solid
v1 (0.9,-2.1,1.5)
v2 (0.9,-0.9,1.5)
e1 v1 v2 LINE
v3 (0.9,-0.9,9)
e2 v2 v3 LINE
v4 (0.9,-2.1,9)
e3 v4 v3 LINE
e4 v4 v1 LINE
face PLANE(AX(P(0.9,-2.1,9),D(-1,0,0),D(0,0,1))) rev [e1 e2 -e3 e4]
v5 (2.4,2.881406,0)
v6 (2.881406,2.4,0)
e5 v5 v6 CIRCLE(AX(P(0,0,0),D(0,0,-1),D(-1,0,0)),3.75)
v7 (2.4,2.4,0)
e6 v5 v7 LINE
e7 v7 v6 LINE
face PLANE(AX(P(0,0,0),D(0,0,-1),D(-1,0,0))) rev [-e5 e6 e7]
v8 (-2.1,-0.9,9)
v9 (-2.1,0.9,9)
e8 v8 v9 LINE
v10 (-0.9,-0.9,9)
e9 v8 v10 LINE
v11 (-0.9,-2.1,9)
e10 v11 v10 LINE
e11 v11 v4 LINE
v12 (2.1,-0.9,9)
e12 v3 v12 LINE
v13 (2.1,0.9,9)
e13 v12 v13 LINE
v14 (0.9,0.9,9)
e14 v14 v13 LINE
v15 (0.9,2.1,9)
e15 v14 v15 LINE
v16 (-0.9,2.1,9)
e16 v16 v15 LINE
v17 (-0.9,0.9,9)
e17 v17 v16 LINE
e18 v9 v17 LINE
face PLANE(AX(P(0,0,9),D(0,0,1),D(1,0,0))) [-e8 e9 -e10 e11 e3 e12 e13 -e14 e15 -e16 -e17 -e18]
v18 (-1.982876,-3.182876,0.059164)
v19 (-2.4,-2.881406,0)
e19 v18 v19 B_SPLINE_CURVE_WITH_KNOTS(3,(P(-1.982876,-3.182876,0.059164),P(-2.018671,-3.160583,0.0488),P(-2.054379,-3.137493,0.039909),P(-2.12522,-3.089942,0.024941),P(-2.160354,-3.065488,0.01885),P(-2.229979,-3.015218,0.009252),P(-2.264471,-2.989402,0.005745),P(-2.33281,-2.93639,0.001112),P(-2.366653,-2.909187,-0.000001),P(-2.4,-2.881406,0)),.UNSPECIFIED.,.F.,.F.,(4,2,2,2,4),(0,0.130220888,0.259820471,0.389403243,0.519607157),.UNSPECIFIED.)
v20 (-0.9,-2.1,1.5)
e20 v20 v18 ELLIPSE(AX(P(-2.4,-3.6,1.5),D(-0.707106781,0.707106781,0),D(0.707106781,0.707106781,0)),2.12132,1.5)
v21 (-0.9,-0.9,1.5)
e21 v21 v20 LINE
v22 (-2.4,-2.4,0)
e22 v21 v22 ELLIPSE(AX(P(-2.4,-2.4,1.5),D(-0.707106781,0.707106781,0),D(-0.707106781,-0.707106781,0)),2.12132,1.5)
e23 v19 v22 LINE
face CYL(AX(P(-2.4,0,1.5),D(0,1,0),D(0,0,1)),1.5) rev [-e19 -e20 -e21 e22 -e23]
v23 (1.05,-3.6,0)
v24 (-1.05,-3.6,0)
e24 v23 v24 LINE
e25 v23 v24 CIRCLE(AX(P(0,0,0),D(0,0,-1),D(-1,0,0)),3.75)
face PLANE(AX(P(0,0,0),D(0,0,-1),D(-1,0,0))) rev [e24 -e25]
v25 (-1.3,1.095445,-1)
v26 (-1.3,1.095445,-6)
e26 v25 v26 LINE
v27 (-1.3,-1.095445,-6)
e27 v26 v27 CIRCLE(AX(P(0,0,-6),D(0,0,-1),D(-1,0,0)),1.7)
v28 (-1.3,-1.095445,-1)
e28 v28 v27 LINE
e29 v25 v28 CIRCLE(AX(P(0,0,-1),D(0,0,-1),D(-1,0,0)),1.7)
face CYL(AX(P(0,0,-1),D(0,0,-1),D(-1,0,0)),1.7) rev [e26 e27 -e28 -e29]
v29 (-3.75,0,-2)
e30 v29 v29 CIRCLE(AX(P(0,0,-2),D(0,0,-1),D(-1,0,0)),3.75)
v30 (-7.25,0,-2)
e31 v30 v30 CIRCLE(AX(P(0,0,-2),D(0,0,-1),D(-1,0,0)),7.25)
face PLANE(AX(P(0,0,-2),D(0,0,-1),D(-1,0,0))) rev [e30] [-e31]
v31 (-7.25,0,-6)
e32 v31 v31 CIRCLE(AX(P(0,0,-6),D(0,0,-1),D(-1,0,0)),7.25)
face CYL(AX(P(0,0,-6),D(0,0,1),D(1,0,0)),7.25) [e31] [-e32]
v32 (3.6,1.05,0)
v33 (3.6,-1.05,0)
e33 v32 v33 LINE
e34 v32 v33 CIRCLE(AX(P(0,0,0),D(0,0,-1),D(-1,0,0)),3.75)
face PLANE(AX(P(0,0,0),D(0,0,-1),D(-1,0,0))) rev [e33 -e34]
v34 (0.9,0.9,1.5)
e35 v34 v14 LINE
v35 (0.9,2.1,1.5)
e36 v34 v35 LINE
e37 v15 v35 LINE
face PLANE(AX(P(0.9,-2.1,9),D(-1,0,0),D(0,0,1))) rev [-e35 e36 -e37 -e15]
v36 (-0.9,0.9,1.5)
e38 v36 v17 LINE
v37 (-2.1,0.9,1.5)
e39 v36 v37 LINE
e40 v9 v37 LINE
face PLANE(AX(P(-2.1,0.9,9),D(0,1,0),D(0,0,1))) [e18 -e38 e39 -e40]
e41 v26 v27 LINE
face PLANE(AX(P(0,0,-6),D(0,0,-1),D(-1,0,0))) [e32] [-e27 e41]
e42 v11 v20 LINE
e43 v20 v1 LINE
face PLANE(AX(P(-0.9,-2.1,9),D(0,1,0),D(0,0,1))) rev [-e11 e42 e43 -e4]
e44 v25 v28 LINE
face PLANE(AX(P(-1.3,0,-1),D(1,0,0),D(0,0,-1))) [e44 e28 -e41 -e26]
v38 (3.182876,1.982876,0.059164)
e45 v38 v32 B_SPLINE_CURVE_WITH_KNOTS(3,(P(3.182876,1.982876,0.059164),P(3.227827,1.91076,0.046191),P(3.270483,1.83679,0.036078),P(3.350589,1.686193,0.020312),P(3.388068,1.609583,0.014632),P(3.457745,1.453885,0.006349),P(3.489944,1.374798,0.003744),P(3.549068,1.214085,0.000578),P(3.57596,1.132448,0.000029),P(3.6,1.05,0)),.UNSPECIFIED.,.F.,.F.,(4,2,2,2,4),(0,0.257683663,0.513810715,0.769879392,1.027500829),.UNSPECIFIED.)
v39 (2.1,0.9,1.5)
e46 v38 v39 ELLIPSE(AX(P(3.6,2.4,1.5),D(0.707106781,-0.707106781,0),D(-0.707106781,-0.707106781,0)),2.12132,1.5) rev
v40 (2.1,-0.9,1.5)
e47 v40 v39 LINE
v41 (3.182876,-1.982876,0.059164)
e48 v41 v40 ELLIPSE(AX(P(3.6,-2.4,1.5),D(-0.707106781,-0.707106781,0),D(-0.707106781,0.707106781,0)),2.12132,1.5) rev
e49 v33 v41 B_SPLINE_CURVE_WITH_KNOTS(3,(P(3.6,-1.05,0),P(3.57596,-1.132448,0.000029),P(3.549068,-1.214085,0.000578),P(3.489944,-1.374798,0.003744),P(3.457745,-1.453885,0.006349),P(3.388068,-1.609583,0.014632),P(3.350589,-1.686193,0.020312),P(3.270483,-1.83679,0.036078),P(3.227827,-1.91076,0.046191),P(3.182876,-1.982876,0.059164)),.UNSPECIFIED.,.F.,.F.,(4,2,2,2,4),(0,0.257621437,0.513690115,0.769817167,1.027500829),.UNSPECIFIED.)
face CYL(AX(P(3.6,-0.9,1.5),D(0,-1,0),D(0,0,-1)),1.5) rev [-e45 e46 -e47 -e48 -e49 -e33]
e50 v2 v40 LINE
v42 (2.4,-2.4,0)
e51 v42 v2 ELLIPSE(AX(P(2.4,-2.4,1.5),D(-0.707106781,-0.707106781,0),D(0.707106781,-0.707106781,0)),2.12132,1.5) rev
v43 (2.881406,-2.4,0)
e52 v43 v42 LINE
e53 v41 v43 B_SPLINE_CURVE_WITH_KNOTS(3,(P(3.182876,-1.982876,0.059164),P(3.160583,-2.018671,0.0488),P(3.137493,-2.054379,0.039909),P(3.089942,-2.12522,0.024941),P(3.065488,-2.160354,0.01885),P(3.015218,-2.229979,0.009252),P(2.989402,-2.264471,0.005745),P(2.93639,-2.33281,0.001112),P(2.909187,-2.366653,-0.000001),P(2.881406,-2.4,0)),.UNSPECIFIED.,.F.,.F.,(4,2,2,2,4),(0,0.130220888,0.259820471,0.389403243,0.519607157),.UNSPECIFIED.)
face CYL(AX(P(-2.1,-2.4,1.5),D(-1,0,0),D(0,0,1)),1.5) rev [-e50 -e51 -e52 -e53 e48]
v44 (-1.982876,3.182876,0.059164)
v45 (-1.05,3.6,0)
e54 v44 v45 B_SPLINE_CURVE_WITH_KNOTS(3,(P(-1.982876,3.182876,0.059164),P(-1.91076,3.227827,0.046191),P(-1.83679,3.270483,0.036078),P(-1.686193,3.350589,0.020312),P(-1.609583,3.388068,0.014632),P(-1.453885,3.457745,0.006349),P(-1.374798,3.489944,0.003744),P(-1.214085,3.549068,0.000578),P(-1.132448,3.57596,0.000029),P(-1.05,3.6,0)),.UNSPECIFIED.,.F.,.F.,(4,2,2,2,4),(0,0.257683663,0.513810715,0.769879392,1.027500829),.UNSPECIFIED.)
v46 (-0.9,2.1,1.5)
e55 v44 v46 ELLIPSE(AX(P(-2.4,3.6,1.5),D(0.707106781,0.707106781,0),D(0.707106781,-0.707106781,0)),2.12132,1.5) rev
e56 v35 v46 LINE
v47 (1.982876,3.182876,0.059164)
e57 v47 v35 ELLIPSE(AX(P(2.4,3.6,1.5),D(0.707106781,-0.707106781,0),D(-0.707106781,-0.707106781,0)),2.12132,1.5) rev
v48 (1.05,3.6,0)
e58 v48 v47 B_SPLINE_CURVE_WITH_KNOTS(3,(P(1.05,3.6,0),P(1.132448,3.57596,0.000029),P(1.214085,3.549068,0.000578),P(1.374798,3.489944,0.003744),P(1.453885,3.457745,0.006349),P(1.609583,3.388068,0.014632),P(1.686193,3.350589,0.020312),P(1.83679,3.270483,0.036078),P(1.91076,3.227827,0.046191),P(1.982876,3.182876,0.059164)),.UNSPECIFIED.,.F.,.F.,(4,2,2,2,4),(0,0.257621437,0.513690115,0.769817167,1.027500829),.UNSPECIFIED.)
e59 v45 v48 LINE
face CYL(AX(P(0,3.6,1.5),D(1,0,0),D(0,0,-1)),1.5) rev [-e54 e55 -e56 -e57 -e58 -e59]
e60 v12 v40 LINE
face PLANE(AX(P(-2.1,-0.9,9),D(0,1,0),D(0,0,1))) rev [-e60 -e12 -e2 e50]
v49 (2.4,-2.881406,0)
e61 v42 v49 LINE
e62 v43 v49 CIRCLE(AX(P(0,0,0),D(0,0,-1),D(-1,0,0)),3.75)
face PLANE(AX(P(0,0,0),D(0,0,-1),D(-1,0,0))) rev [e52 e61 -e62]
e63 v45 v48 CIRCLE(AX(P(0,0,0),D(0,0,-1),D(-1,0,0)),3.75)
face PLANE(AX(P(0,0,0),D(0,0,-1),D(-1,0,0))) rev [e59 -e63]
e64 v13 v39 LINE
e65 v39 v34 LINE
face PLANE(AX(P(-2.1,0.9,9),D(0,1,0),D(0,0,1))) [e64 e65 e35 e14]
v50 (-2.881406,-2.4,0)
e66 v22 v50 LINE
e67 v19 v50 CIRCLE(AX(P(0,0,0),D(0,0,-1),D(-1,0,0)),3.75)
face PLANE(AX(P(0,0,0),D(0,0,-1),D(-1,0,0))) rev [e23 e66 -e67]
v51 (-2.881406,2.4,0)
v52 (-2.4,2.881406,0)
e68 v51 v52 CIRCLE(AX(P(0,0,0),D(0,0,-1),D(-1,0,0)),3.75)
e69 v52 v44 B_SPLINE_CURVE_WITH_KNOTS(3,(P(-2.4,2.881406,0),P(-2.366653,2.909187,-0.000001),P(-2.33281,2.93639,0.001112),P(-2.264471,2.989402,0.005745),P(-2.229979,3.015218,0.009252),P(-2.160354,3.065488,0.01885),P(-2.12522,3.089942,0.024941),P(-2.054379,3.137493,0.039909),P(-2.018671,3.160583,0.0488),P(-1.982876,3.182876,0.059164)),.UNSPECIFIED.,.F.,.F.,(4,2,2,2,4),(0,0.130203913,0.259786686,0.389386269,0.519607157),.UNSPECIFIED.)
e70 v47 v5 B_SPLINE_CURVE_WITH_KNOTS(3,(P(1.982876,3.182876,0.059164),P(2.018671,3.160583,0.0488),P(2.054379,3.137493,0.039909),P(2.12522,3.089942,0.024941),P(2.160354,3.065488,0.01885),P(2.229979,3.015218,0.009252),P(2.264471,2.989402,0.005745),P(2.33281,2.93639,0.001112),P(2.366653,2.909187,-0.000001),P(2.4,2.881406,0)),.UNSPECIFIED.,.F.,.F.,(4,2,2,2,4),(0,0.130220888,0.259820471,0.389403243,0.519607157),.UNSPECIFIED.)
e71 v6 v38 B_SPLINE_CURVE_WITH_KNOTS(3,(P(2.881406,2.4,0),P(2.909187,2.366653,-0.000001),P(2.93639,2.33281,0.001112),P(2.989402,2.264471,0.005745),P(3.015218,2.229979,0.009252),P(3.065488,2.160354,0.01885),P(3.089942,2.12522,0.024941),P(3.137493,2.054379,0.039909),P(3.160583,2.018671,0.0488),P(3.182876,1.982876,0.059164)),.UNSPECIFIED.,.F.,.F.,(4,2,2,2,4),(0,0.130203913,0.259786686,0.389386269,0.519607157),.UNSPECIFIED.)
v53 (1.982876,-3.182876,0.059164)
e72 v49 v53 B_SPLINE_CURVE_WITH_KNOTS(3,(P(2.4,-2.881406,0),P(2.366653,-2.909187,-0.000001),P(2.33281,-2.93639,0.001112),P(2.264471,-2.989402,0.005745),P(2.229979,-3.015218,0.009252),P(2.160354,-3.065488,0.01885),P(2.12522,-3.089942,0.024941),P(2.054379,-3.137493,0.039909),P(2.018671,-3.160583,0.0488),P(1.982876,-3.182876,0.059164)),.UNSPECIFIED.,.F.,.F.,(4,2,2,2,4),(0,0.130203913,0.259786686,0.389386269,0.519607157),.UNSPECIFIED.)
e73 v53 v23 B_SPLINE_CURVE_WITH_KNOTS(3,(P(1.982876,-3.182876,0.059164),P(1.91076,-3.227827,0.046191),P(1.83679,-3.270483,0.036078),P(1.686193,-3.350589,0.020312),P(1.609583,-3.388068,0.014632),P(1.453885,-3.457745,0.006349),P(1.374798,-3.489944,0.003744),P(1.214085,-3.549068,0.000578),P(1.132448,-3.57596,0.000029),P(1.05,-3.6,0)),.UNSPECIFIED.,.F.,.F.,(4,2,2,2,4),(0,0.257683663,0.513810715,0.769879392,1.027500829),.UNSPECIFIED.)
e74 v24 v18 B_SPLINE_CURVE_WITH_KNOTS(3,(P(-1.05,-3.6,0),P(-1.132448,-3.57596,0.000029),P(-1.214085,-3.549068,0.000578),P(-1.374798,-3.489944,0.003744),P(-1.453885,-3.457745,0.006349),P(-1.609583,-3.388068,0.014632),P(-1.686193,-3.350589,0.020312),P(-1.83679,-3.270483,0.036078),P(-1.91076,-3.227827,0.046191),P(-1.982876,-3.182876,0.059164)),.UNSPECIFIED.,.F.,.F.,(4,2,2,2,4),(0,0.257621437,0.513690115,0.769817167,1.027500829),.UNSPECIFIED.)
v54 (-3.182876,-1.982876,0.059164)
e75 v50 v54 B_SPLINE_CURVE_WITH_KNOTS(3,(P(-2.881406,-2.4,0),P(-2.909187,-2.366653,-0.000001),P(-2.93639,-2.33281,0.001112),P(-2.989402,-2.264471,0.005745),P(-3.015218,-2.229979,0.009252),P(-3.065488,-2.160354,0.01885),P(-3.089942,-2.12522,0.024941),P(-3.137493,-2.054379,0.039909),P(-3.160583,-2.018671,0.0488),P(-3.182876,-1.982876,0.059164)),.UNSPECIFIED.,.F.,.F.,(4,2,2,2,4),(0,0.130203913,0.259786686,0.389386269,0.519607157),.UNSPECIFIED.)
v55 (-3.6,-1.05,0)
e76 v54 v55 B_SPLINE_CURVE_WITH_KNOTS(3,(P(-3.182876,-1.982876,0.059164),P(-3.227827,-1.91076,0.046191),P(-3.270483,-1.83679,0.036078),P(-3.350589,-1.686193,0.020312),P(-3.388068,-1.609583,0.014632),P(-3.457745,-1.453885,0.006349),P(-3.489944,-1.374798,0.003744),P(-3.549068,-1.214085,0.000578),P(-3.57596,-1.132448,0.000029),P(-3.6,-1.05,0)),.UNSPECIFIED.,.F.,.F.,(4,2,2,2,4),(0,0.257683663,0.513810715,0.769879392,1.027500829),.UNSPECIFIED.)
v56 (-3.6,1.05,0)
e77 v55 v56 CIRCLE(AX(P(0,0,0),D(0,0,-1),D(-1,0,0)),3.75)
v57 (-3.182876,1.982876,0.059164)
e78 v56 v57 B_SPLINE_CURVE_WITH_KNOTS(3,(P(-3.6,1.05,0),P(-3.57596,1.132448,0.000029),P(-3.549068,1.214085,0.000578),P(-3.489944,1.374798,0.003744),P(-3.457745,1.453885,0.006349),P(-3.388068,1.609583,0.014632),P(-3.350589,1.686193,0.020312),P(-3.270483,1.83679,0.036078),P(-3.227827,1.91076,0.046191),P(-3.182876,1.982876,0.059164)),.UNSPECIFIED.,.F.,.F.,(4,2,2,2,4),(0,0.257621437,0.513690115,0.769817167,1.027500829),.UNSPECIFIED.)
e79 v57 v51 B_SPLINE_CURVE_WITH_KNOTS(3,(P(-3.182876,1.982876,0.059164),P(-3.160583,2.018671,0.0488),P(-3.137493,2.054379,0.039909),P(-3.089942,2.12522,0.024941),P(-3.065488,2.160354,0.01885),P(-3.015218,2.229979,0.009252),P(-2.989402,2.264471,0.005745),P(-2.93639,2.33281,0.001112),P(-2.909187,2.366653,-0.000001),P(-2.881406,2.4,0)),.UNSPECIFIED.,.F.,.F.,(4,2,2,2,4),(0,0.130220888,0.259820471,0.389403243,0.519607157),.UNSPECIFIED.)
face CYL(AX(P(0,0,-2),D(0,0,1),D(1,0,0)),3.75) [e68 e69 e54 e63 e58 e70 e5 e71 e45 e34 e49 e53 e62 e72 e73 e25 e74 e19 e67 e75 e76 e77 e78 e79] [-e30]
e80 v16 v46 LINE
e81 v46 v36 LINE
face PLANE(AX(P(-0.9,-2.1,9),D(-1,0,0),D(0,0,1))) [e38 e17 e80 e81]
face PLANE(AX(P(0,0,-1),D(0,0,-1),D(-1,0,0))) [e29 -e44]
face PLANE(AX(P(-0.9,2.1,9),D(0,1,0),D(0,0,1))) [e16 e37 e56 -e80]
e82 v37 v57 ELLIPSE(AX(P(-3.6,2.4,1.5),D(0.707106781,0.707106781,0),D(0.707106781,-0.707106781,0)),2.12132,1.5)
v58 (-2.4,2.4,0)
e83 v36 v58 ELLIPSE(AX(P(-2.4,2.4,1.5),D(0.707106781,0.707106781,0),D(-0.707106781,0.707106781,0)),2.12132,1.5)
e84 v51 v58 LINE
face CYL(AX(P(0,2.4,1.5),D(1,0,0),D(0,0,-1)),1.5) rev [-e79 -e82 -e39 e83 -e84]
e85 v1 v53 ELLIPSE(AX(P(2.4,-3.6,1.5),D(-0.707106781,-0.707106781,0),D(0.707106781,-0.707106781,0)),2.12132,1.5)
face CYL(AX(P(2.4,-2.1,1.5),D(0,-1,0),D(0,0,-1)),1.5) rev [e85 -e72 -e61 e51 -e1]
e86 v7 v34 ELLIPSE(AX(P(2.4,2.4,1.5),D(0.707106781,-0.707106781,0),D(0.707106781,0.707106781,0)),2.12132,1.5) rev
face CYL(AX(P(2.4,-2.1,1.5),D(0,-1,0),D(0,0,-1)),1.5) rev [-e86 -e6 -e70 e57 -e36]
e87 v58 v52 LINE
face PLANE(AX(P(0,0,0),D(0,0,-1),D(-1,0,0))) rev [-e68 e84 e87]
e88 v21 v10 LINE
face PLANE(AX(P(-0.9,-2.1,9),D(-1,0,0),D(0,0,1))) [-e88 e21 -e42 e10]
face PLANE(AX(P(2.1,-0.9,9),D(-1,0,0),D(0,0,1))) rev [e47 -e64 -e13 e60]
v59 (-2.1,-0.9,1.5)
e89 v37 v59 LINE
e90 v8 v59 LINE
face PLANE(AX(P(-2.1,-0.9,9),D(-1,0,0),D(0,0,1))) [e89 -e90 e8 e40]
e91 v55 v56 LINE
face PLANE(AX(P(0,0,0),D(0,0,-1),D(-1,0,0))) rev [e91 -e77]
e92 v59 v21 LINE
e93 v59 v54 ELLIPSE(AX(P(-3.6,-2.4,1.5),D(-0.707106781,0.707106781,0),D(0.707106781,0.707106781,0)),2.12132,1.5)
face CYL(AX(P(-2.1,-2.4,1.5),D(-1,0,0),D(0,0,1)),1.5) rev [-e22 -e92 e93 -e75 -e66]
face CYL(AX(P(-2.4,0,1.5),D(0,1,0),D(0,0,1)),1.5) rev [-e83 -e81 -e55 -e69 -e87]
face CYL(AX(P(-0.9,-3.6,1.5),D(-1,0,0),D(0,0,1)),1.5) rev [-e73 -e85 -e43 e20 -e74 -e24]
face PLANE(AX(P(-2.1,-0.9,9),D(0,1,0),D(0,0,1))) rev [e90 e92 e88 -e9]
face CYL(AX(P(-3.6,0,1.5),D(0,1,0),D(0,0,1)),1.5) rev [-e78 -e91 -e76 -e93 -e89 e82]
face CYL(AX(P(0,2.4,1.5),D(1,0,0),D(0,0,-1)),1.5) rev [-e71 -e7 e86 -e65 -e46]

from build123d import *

# Parameters (mm, degrees)
SKETCH_1_W          = 1.8
SKETCH_1_H          = 4.2
SKETCH_1_W_2        = 4.2
SKETCH_1_H_2        = 1.8
EXTRUDE_1_DEPTH     = 9
SKETCH_3_R          = 3.75
EXTRUDE_5_DEPTH     = 2
FILLET_2_R          = 1.5
SKETCH_8_R          = 7.25
EXTRUDE_6_DEPTH     = 4
CUT_EXTRUDE_1_DEPTH = 5


with BuildPart() as part:
    # 草图1 → 凸台-拉伸1 (new body)
    with BuildSketch(Plane.XY):
        Rectangle(SKETCH_1_W, SKETCH_1_H)
        Rectangle(SKETCH_1_W_2, SKETCH_1_H_2)
    extrude(amount=EXTRUDE_1_DEPTH)

    # 草图3 → 凸台-拉伸5 (add)
    with BuildSketch(Plane(origin=(0, 0, 0), x_dir=(-1, 0, 0), z_dir=(0, 0, -1))):
        Circle(SKETCH_3_R)
    extrude(amount=EXTRUDE_5_DEPTH)

    # 圆角2
    # the kernel refuses this fillet: 1.5 mm, written as the material it adds along each edge
    with BuildSketch(Plane(origin=(-2.85, -0.9, 0), x_dir=(0, -1, 0), z_dir=(1, 0, 0))) as fillet_2_piece_1_section:
        with BuildLine():
            CenterArc((FILLET_2_R, -FILLET_2_R), FILLET_2_R, 90, 90)
            Line((0, -FILLET_2_R), (0, 0))
            Line((0, 0), (FILLET_2_R, 0))
        make_face()
    fillet_2_piece_1 = extrude(amount=4.95, mode=Mode.PRIVATE)
    fillet_2_piece_1 = split(fillet_2_piece_1, bisect_by=Plane(origin=(-2.1, -1.239592671, 0.339592671), z_dir=(1, 0, 0)), keep=Keep.TOP, mode=Mode.PRIVATE)
    add(fillet_2_piece_1)
    with BuildSketch(Plane(origin=(2.1, 0.9, 0), x_dir=(0, 1, 0), z_dir=(-1, 0, 0))) as fillet_2_piece_2_section:
        with BuildLine():
            CenterArc((FILLET_2_R, -FILLET_2_R), FILLET_2_R, 90, 90)
            Line((0, -FILLET_2_R), (0, 0))
            Line((0, 0), (FILLET_2_R, 0))
        make_face()
    fillet_2_piece_2 = extrude(amount=4.95, mode=Mode.PRIVATE)
    fillet_2_piece_2 = split(fillet_2_piece_2, bisect_by=Plane(origin=(-2.1, 1.239592671, 0.339592671), z_dir=(1, 0, 0)), keep=Keep.TOP, mode=Mode.PRIVATE)
    add(fillet_2_piece_2)
    with BuildSketch(Plane(origin=(-0.9, -2.1, 0), x_dir=(0, -1, 0), z_dir=(1, 0, 0)), Plane(origin=(0.9, 2.1, 0), x_dir=(0, 1, 0), z_dir=(-1, 0, 0)), Plane(origin=(-2.1, 0.9, 0), x_dir=(-1, 0, 0), z_dir=(0, -1, 0)), Plane(origin=(2.1, -0.9, 0), x_dir=(1, 0, 0), z_dir=(0, 1, 0))) as fillet_2_piece_3:
        with BuildLine():
            CenterArc((FILLET_2_R, -FILLET_2_R), FILLET_2_R, 90, 90)
            Line((0, -FILLET_2_R), (0, 0))
            Line((0, 0), (FILLET_2_R, 0))
        make_face()
    extrude(amount=1.8)
    with BuildSketch(Plane(origin=(0.9, -2.1, 0), x_dir=(1, 0, 0), z_dir=(0, 1, 0))) as fillet_2_piece_4_section:
        with BuildLine():
            CenterArc((FILLET_2_R, -FILLET_2_R), FILLET_2_R, 90, 90)
            Line((0, -FILLET_2_R), (0, 0))
            Line((0, 0), (FILLET_2_R, 0))
        make_face()
    fillet_2_piece_4 = extrude(amount=4.95, mode=Mode.PRIVATE)
    fillet_2_piece_4 = split(fillet_2_piece_4, bisect_by=Plane(origin=(1.239592671, 2.1, 0.339592671), z_dir=(0, -1, 0)), keep=Keep.TOP, mode=Mode.PRIVATE)
    add(fillet_2_piece_4)
    with BuildSketch(Plane(origin=(0.9, -2.85, 0), x_dir=(1, 0, 0), z_dir=(0, 1, 0))) as fillet_2_piece_5_section:
        with BuildLine():
            CenterArc((FILLET_2_R, -FILLET_2_R), FILLET_2_R, 90, 90)
            Line((0, -FILLET_2_R), (0, 0))
            Line((0, 0), (FILLET_2_R, 0))
        make_face()
    fillet_2_piece_5 = extrude(amount=4.95, mode=Mode.PRIVATE)
    fillet_2_piece_5 = split(fillet_2_piece_5, bisect_by=Plane(origin=(1.239592671, -2.1, 0.339592671), z_dir=(0, 1, 0)), keep=Keep.TOP, mode=Mode.PRIVATE)
    add(fillet_2_piece_5)
    with BuildSketch(Plane(origin=(-0.9, 2.85, 0), x_dir=(-1, 0, 0), z_dir=(0, -1, 0))) as fillet_2_piece_6_section:
        with BuildLine():
            CenterArc((FILLET_2_R, -FILLET_2_R), FILLET_2_R, 90, 90)
            Line((0, -FILLET_2_R), (0, 0))
            Line((0, 0), (FILLET_2_R, 0))
        make_face()
    fillet_2_piece_6 = extrude(amount=4.95, mode=Mode.PRIVATE)
    fillet_2_piece_6 = split(fillet_2_piece_6, bisect_by=Plane(origin=(-1.239592671, 2.1, 0.339592671), z_dir=(0, -1, 0)), keep=Keep.TOP, mode=Mode.PRIVATE)
    add(fillet_2_piece_6)
    with BuildSketch(Plane(origin=(-0.9, 2.1, 0), x_dir=(-1, 0, 0), z_dir=(0, -1, 0))) as fillet_2_piece_7_section:
        with BuildLine():
            CenterArc((FILLET_2_R, -FILLET_2_R), FILLET_2_R, 90, 90)
            Line((0, -FILLET_2_R), (0, 0))
            Line((0, 0), (FILLET_2_R, 0))
        make_face()
    fillet_2_piece_7 = extrude(amount=4.95, mode=Mode.PRIVATE)
    fillet_2_piece_7 = split(fillet_2_piece_7, bisect_by=Plane(origin=(-1.239592671, -2.1, 0.339592671), z_dir=(0, 1, 0)), keep=Keep.TOP, mode=Mode.PRIVATE)
    add(fillet_2_piece_7)
    with BuildSketch(Plane(origin=(2.85, 0.9, 0), x_dir=(0, 1, 0), z_dir=(-1, 0, 0))) as fillet_2_piece_8_section:
        with BuildLine():
            CenterArc((FILLET_2_R, -FILLET_2_R), FILLET_2_R, 90, 90)
            Line((0, -FILLET_2_R), (0, 0))
            Line((0, 0), (FILLET_2_R, 0))
        make_face()
    fillet_2_piece_8 = extrude(amount=4.95, mode=Mode.PRIVATE)
    fillet_2_piece_8 = split(fillet_2_piece_8, bisect_by=Plane(origin=(2.1, 1.239592671, 0.339592671), z_dir=(-1, 0, 0)), keep=Keep.TOP, mode=Mode.PRIVATE)
    add(fillet_2_piece_8)
    with BuildSketch(Plane(origin=(-2.1, -0.9, 0), x_dir=(0, -1, 0), z_dir=(1, 0, 0))) as fillet_2_piece_9_section:
        with BuildLine():
            CenterArc((FILLET_2_R, -FILLET_2_R), FILLET_2_R, 90, 90)
            Line((0, -FILLET_2_R), (0, 0))
            Line((0, 0), (FILLET_2_R, 0))
        make_face()
    fillet_2_piece_9 = extrude(amount=4.95, mode=Mode.PRIVATE)
    fillet_2_piece_9 = split(fillet_2_piece_9, bisect_by=Plane(origin=(2.1, -1.239592671, 0.339592671), z_dir=(-1, 0, 0)), keep=Keep.TOP, mode=Mode.PRIVATE)
    add(fillet_2_piece_9)
    with BuildSketch(Plane(origin=(2.1, -4.65, 0), x_dir=(1, 0, 0), z_dir=(0, 1, 0))) as fillet_2_piece_10a_section:
        with BuildLine():
            CenterArc((FILLET_2_R, -FILLET_2_R), FILLET_2_R, 90, 90)
            Line((0, -FILLET_2_R), (0, 0))
            Line((0, 0), (FILLET_2_R, 0))
        make_face()
    fillet_2_piece_10a = extrude(amount=5.55, mode=Mode.PRIVATE)
    fillet_2_piece_10a = fillet_2_piece_10a & Plane(origin=(0, 0, 0.370789592), x_dir=(-1, 0, 0), z_dir=(0, 0, 1)) * Cylinder(3.75, 18, mode=Mode.PRIVATE)
    fillet_2_piece_10a = split(fillet_2_piece_10a, bisect_by=Plane(origin=(2.382978133, -0.9, 0.370789592), z_dir=(0, -1, 0)), keep=Keep.TOP, mode=Mode.PRIVATE)
    with BuildSketch(Plane(origin=(0.9, -0.9, 0), x_dir=(0, -1, 0), z_dir=(1, 0, 0))) as fillet_2_piece_10b_section:
        with BuildLine():
            CenterArc((FILLET_2_R, -FILLET_2_R), FILLET_2_R, 90, 90)
            Line((0, -FILLET_2_R), (0, 0))
            Line((0, 0), (FILLET_2_R, 0))
        make_face()
    fillet_2_piece_10b = extrude(amount=4.95, mode=Mode.PRIVATE)
    fillet_2_piece_10b = fillet_2_piece_10b & Plane(origin=(0, 0, 0.356473498), x_dir=(-1, 0, 0), z_dir=(0, 0, 1)) * Cylinder(3.75, 16, mode=Mode.PRIVATE)
    fillet_2_piece_10b = split(fillet_2_piece_10b, bisect_by=Plane(origin=(2.1, -1.208975446, 0.356473498), z_dir=(1, 0, 0)), keep=Keep.TOP, mode=Mode.PRIVATE)
    fillet_2_piece_10 = fillet_2_piece_10a & fillet_2_piece_10b
    add(fillet_2_piece_10)
    with BuildSketch(Plane(origin=(5.85, 0.9, 0), x_dir=(0, 1, 0), z_dir=(-1, 0, 0))) as fillet_2_piece_11a_section:
        with BuildLine():
            CenterArc((FILLET_2_R, -FILLET_2_R), FILLET_2_R, 90, 90)
            Line((0, -FILLET_2_R), (0, 0))
            Line((0, 0), (FILLET_2_R, 0))
        make_face()
    fillet_2_piece_11a = extrude(amount=4.95, mode=Mode.PRIVATE)
    fillet_2_piece_11a = fillet_2_piece_11a & Plane(origin=(0, 0, 0.356473584), x_dir=(-1, 0, 0), z_dir=(0, 0, 1)) * Cylinder(3.75, 16, mode=Mode.PRIVATE)
    fillet_2_piece_11a = split(fillet_2_piece_11a, bisect_by=Plane(origin=(2.1, 1.208975364, 0.356473584), z_dir=(1, 0, 0)), keep=Keep.TOP, mode=Mode.PRIVATE)
    with BuildSketch(Plane(origin=(2.1, -0.9, 0), x_dir=(1, 0, 0), z_dir=(0, 1, 0))) as fillet_2_piece_11b_section:
        with BuildLine():
            CenterArc((FILLET_2_R, -FILLET_2_R), FILLET_2_R, 90, 90)
            Line((0, -FILLET_2_R), (0, 0))
            Line((0, 0), (FILLET_2_R, 0))
        make_face()
    fillet_2_piece_11b = extrude(amount=5.55, mode=Mode.PRIVATE)
    fillet_2_piece_11b = fillet_2_piece_11b & Plane(origin=(0, 0, 0.370789978), x_dir=(-1, 0, 0), z_dir=(0, 0, 1)) * Cylinder(3.75, 18, mode=Mode.PRIVATE)
    fillet_2_piece_11b = split(fillet_2_piece_11b, bisect_by=Plane(origin=(2.382978714, 0.9, 0.370789978), z_dir=(0, 1, 0)), keep=Keep.TOP, mode=Mode.PRIVATE)
    fillet_2_piece_11 = fillet_2_piece_11a & fillet_2_piece_11b
    add(fillet_2_piece_11)
    with BuildSketch(Plane(origin=(-0.9, -0.9, 0), x_dir=(-1, 0, 0), z_dir=(0, -1, 0))) as fillet_2_piece_12a_section:
        with BuildLine():
            CenterArc((FILLET_2_R, -FILLET_2_R), FILLET_2_R, 90, 90)
            Line((0, -FILLET_2_R), (0, 0))
            Line((0, 0), (FILLET_2_R, 0))
        make_face()
    fillet_2_piece_12a = extrude(amount=4.95, mode=Mode.PRIVATE)
    fillet_2_piece_12a = fillet_2_piece_12a & Plane(origin=(0, 0, 0.356473498), x_dir=(-1, 0, 0), z_dir=(0, 0, 1)) * Cylinder(3.75, 16, mode=Mode.PRIVATE)
    fillet_2_piece_12a = split(fillet_2_piece_12a, bisect_by=Plane(origin=(-1.208975446, -2.1, 0.356473498), z_dir=(0, -1, 0)), keep=Keep.TOP, mode=Mode.PRIVATE)
    with BuildSketch(Plane(origin=(-4.65, -2.1, 0), x_dir=(0, -1, 0), z_dir=(1, 0, 0))) as fillet_2_piece_12b_section:
        with BuildLine():
            CenterArc((FILLET_2_R, -FILLET_2_R), FILLET_2_R, 90, 90)
            Line((0, -FILLET_2_R), (0, 0))
            Line((0, 0), (FILLET_2_R, 0))
        make_face()
    fillet_2_piece_12b = extrude(amount=5.55, mode=Mode.PRIVATE)
    fillet_2_piece_12b = fillet_2_piece_12b & Plane(origin=(0, 0, 0.370789592), x_dir=(-1, 0, 0), z_dir=(0, 0, 1)) * Cylinder(3.75, 18, mode=Mode.PRIVATE)
    fillet_2_piece_12b = split(fillet_2_piece_12b, bisect_by=Plane(origin=(-0.9, -2.382978133, 0.370789592), z_dir=(-1, 0, 0)), keep=Keep.TOP, mode=Mode.PRIVATE)
    fillet_2_piece_12 = fillet_2_piece_12a & fillet_2_piece_12b
    add(fillet_2_piece_12)
    with BuildSketch(Plane(origin=(0.9, -5.85, 0), x_dir=(1, 0, 0), z_dir=(0, 1, 0))) as fillet_2_piece_13a_section:
        with BuildLine():
            CenterArc((FILLET_2_R, -FILLET_2_R), FILLET_2_R, 90, 90)
            Line((0, -FILLET_2_R), (0, 0))
            Line((0, 0), (FILLET_2_R, 0))
        make_face()
    fillet_2_piece_13a = extrude(amount=4.95, mode=Mode.PRIVATE)
    fillet_2_piece_13a = fillet_2_piece_13a & Plane(origin=(0, 0, 0.356473584), x_dir=(-1, 0, 0), z_dir=(0, 0, 1)) * Cylinder(3.75, 16, mode=Mode.PRIVATE)
    fillet_2_piece_13a = split(fillet_2_piece_13a, bisect_by=Plane(origin=(1.208975364, -2.1, 0.356473584), z_dir=(0, -1, 0)), keep=Keep.TOP, mode=Mode.PRIVATE)
    with BuildSketch(Plane(origin=(-0.9, -2.1, 0), x_dir=(0, -1, 0), z_dir=(1, 0, 0))) as fillet_2_piece_13b_section:
        with BuildLine():
            CenterArc((FILLET_2_R, -FILLET_2_R), FILLET_2_R, 90, 90)
            Line((0, -FILLET_2_R), (0, 0))
            Line((0, 0), (FILLET_2_R, 0))
        make_face()
    fillet_2_piece_13b = extrude(amount=5.55, mode=Mode.PRIVATE)
    fillet_2_piece_13b = fillet_2_piece_13b & Plane(origin=(0, 0, 0.370789978), x_dir=(-1, 0, 0), z_dir=(0, 0, 1)) * Cylinder(3.75, 18, mode=Mode.PRIVATE)
    fillet_2_piece_13b = split(fillet_2_piece_13b, bisect_by=Plane(origin=(0.9, -2.382978714, 0.370789978), z_dir=(1, 0, 0)), keep=Keep.TOP, mode=Mode.PRIVATE)
    fillet_2_piece_13 = fillet_2_piece_13a & fillet_2_piece_13b
    add(fillet_2_piece_13)
    with BuildSketch(Plane(origin=(4.65, 2.1, 0), x_dir=(0, 1, 0), z_dir=(-1, 0, 0))) as fillet_2_piece_14a_section:
        with BuildLine():
            CenterArc((FILLET_2_R, -FILLET_2_R), FILLET_2_R, 90, 90)
            Line((0, -FILLET_2_R), (0, 0))
            Line((0, 0), (FILLET_2_R, 0))
        make_face()
    fillet_2_piece_14a = extrude(amount=5.55, mode=Mode.PRIVATE)
    fillet_2_piece_14a = fillet_2_piece_14a & Plane(origin=(0, 0, 0.370789592), x_dir=(-1, 0, 0), z_dir=(0, 0, 1)) * Cylinder(3.75, 18, mode=Mode.PRIVATE)
    fillet_2_piece_14a = split(fillet_2_piece_14a, bisect_by=Plane(origin=(0.9, 2.382978133, 0.370789592), z_dir=(1, 0, 0)), keep=Keep.TOP, mode=Mode.PRIVATE)
    with BuildSketch(Plane(origin=(0.9, 0.9, 0), x_dir=(1, 0, 0), z_dir=(0, 1, 0))) as fillet_2_piece_14b_section:
        with BuildLine():
            CenterArc((FILLET_2_R, -FILLET_2_R), FILLET_2_R, 90, 90)
            Line((0, -FILLET_2_R), (0, 0))
            Line((0, 0), (FILLET_2_R, 0))
        make_face()
    fillet_2_piece_14b = extrude(amount=4.95, mode=Mode.PRIVATE)
    fillet_2_piece_14b = fillet_2_piece_14b & Plane(origin=(0, 0, 0.356473498), x_dir=(-1, 0, 0), z_dir=(0, 0, 1)) * Cylinder(3.75, 16, mode=Mode.PRIVATE)
    fillet_2_piece_14b = split(fillet_2_piece_14b, bisect_by=Plane(origin=(1.208975446, 2.1, 0.356473498), z_dir=(0, 1, 0)), keep=Keep.TOP, mode=Mode.PRIVATE)
    fillet_2_piece_14 = fillet_2_piece_14a & fillet_2_piece_14b
    add(fillet_2_piece_14)
    with BuildSketch(Plane(origin=(-0.9, 5.85, 0), x_dir=(-1, 0, 0), z_dir=(0, -1, 0))) as fillet_2_piece_15a_section:
        with BuildLine():
            CenterArc((FILLET_2_R, -FILLET_2_R), FILLET_2_R, 90, 90)
            Line((0, -FILLET_2_R), (0, 0))
            Line((0, 0), (FILLET_2_R, 0))
        make_face()
    fillet_2_piece_15a = extrude(amount=4.95, mode=Mode.PRIVATE)
    fillet_2_piece_15a = fillet_2_piece_15a & Plane(origin=(0, 0, 0.356473584), x_dir=(-1, 0, 0), z_dir=(0, 0, 1)) * Cylinder(3.75, 16, mode=Mode.PRIVATE)
    fillet_2_piece_15a = split(fillet_2_piece_15a, bisect_by=Plane(origin=(-1.208975364, 2.1, 0.356473584), z_dir=(0, 1, 0)), keep=Keep.TOP, mode=Mode.PRIVATE)
    with BuildSketch(Plane(origin=(0.9, 2.1, 0), x_dir=(0, 1, 0), z_dir=(-1, 0, 0))) as fillet_2_piece_15b_section:
        with BuildLine():
            CenterArc((FILLET_2_R, -FILLET_2_R), FILLET_2_R, 90, 90)
            Line((0, -FILLET_2_R), (0, 0))
            Line((0, 0), (FILLET_2_R, 0))
        make_face()
    fillet_2_piece_15b = extrude(amount=5.55, mode=Mode.PRIVATE)
    fillet_2_piece_15b = fillet_2_piece_15b & Plane(origin=(0, 0, 0.370789978), x_dir=(-1, 0, 0), z_dir=(0, 0, 1)) * Cylinder(3.75, 18, mode=Mode.PRIVATE)
    fillet_2_piece_15b = split(fillet_2_piece_15b, bisect_by=Plane(origin=(-0.9, 2.382978714, 0.370789978), z_dir=(-1, 0, 0)), keep=Keep.TOP, mode=Mode.PRIVATE)
    fillet_2_piece_15 = fillet_2_piece_15a & fillet_2_piece_15b
    add(fillet_2_piece_15)
    with BuildSketch(Plane(origin=(-2.1, 4.65, 0), x_dir=(-1, 0, 0), z_dir=(0, -1, 0))) as fillet_2_piece_16a_section:
        with BuildLine():
            CenterArc((FILLET_2_R, -FILLET_2_R), FILLET_2_R, 90, 90)
            Line((0, -FILLET_2_R), (0, 0))
            Line((0, 0), (FILLET_2_R, 0))
        make_face()
    fillet_2_piece_16a = extrude(amount=5.55, mode=Mode.PRIVATE)
    fillet_2_piece_16a = fillet_2_piece_16a & Plane(origin=(0, 0, 0.370789592), x_dir=(-1, 0, 0), z_dir=(0, 0, 1)) * Cylinder(3.75, 18, mode=Mode.PRIVATE)
    fillet_2_piece_16a = split(fillet_2_piece_16a, bisect_by=Plane(origin=(-2.382978133, 0.9, 0.370789592), z_dir=(0, 1, 0)), keep=Keep.TOP, mode=Mode.PRIVATE)
    with BuildSketch(Plane(origin=(-0.9, 0.9, 0), x_dir=(0, 1, 0), z_dir=(-1, 0, 0))) as fillet_2_piece_16b_section:
        with BuildLine():
            CenterArc((FILLET_2_R, -FILLET_2_R), FILLET_2_R, 90, 90)
            Line((0, -FILLET_2_R), (0, 0))
            Line((0, 0), (FILLET_2_R, 0))
        make_face()
    fillet_2_piece_16b = extrude(amount=4.95, mode=Mode.PRIVATE)
    fillet_2_piece_16b = fillet_2_piece_16b & Plane(origin=(0, 0, 0.356473498), x_dir=(-1, 0, 0), z_dir=(0, 0, 1)) * Cylinder(3.75, 16, mode=Mode.PRIVATE)
    fillet_2_piece_16b = split(fillet_2_piece_16b, bisect_by=Plane(origin=(-2.1, 1.208975446, 0.356473498), z_dir=(-1, 0, 0)), keep=Keep.TOP, mode=Mode.PRIVATE)
    fillet_2_piece_16 = fillet_2_piece_16a & fillet_2_piece_16b
    add(fillet_2_piece_16)
    with BuildSketch(Plane(origin=(-5.85, -0.9, 0), x_dir=(0, -1, 0), z_dir=(1, 0, 0))) as fillet_2_piece_17a_section:
        with BuildLine():
            CenterArc((FILLET_2_R, -FILLET_2_R), FILLET_2_R, 90, 90)
            Line((0, -FILLET_2_R), (0, 0))
            Line((0, 0), (FILLET_2_R, 0))
        make_face()
    fillet_2_piece_17a = extrude(amount=4.95, mode=Mode.PRIVATE)
    fillet_2_piece_17a = fillet_2_piece_17a & Plane(origin=(0, 0, 0.356473584), x_dir=(-1, 0, 0), z_dir=(0, 0, 1)) * Cylinder(3.75, 16, mode=Mode.PRIVATE)
    fillet_2_piece_17a = split(fillet_2_piece_17a, bisect_by=Plane(origin=(-2.1, -1.208975364, 0.356473584), z_dir=(-1, 0, 0)), keep=Keep.TOP, mode=Mode.PRIVATE)
    with BuildSketch(Plane(origin=(-2.1, 0.9, 0), x_dir=(-1, 0, 0), z_dir=(0, -1, 0))) as fillet_2_piece_17b_section:
        with BuildLine():
            CenterArc((FILLET_2_R, -FILLET_2_R), FILLET_2_R, 90, 90)
            Line((0, -FILLET_2_R), (0, 0))
            Line((0, 0), (FILLET_2_R, 0))
        make_face()
    fillet_2_piece_17b = extrude(amount=5.55, mode=Mode.PRIVATE)
    fillet_2_piece_17b = fillet_2_piece_17b & Plane(origin=(0, 0, 0.370789978), x_dir=(-1, 0, 0), z_dir=(0, 0, 1)) * Cylinder(3.75, 18, mode=Mode.PRIVATE)
    fillet_2_piece_17b = split(fillet_2_piece_17b, bisect_by=Plane(origin=(-2.382978714, -0.9, 0.370789978), z_dir=(0, -1, 0)), keep=Keep.TOP, mode=Mode.PRIVATE)
    fillet_2_piece_17 = fillet_2_piece_17a & fillet_2_piece_17b
    add(fillet_2_piece_17)

    # 草图8 → 凸台-拉伸6 (add)
    with BuildSketch(Plane(origin=(0, 0, -2), x_dir=(-1, 0, 0), z_dir=(0, 0, -1))):
        Circle(SKETCH_8_R)
    extrude(amount=EXTRUDE_6_DEPTH)

    # 草图7 → 切除-拉伸1 (cut)
    with BuildSketch(Plane(origin=(0, 0, -6), x_dir=(-1, 0, 0), z_dir=(0, 0, -1))):
        with BuildLine():
            Line((1.3, -1.095445115), (1.3, 1.095445115))
            ThreePointArc((1.3, 1.095445115), (-1.7, 0), (1.3, -1.095445115))
        make_face()
    extrude(amount=-CUT_EXTRUDE_1_DEPTH, mode=Mode.SUBTRACT)


solid = part.part
